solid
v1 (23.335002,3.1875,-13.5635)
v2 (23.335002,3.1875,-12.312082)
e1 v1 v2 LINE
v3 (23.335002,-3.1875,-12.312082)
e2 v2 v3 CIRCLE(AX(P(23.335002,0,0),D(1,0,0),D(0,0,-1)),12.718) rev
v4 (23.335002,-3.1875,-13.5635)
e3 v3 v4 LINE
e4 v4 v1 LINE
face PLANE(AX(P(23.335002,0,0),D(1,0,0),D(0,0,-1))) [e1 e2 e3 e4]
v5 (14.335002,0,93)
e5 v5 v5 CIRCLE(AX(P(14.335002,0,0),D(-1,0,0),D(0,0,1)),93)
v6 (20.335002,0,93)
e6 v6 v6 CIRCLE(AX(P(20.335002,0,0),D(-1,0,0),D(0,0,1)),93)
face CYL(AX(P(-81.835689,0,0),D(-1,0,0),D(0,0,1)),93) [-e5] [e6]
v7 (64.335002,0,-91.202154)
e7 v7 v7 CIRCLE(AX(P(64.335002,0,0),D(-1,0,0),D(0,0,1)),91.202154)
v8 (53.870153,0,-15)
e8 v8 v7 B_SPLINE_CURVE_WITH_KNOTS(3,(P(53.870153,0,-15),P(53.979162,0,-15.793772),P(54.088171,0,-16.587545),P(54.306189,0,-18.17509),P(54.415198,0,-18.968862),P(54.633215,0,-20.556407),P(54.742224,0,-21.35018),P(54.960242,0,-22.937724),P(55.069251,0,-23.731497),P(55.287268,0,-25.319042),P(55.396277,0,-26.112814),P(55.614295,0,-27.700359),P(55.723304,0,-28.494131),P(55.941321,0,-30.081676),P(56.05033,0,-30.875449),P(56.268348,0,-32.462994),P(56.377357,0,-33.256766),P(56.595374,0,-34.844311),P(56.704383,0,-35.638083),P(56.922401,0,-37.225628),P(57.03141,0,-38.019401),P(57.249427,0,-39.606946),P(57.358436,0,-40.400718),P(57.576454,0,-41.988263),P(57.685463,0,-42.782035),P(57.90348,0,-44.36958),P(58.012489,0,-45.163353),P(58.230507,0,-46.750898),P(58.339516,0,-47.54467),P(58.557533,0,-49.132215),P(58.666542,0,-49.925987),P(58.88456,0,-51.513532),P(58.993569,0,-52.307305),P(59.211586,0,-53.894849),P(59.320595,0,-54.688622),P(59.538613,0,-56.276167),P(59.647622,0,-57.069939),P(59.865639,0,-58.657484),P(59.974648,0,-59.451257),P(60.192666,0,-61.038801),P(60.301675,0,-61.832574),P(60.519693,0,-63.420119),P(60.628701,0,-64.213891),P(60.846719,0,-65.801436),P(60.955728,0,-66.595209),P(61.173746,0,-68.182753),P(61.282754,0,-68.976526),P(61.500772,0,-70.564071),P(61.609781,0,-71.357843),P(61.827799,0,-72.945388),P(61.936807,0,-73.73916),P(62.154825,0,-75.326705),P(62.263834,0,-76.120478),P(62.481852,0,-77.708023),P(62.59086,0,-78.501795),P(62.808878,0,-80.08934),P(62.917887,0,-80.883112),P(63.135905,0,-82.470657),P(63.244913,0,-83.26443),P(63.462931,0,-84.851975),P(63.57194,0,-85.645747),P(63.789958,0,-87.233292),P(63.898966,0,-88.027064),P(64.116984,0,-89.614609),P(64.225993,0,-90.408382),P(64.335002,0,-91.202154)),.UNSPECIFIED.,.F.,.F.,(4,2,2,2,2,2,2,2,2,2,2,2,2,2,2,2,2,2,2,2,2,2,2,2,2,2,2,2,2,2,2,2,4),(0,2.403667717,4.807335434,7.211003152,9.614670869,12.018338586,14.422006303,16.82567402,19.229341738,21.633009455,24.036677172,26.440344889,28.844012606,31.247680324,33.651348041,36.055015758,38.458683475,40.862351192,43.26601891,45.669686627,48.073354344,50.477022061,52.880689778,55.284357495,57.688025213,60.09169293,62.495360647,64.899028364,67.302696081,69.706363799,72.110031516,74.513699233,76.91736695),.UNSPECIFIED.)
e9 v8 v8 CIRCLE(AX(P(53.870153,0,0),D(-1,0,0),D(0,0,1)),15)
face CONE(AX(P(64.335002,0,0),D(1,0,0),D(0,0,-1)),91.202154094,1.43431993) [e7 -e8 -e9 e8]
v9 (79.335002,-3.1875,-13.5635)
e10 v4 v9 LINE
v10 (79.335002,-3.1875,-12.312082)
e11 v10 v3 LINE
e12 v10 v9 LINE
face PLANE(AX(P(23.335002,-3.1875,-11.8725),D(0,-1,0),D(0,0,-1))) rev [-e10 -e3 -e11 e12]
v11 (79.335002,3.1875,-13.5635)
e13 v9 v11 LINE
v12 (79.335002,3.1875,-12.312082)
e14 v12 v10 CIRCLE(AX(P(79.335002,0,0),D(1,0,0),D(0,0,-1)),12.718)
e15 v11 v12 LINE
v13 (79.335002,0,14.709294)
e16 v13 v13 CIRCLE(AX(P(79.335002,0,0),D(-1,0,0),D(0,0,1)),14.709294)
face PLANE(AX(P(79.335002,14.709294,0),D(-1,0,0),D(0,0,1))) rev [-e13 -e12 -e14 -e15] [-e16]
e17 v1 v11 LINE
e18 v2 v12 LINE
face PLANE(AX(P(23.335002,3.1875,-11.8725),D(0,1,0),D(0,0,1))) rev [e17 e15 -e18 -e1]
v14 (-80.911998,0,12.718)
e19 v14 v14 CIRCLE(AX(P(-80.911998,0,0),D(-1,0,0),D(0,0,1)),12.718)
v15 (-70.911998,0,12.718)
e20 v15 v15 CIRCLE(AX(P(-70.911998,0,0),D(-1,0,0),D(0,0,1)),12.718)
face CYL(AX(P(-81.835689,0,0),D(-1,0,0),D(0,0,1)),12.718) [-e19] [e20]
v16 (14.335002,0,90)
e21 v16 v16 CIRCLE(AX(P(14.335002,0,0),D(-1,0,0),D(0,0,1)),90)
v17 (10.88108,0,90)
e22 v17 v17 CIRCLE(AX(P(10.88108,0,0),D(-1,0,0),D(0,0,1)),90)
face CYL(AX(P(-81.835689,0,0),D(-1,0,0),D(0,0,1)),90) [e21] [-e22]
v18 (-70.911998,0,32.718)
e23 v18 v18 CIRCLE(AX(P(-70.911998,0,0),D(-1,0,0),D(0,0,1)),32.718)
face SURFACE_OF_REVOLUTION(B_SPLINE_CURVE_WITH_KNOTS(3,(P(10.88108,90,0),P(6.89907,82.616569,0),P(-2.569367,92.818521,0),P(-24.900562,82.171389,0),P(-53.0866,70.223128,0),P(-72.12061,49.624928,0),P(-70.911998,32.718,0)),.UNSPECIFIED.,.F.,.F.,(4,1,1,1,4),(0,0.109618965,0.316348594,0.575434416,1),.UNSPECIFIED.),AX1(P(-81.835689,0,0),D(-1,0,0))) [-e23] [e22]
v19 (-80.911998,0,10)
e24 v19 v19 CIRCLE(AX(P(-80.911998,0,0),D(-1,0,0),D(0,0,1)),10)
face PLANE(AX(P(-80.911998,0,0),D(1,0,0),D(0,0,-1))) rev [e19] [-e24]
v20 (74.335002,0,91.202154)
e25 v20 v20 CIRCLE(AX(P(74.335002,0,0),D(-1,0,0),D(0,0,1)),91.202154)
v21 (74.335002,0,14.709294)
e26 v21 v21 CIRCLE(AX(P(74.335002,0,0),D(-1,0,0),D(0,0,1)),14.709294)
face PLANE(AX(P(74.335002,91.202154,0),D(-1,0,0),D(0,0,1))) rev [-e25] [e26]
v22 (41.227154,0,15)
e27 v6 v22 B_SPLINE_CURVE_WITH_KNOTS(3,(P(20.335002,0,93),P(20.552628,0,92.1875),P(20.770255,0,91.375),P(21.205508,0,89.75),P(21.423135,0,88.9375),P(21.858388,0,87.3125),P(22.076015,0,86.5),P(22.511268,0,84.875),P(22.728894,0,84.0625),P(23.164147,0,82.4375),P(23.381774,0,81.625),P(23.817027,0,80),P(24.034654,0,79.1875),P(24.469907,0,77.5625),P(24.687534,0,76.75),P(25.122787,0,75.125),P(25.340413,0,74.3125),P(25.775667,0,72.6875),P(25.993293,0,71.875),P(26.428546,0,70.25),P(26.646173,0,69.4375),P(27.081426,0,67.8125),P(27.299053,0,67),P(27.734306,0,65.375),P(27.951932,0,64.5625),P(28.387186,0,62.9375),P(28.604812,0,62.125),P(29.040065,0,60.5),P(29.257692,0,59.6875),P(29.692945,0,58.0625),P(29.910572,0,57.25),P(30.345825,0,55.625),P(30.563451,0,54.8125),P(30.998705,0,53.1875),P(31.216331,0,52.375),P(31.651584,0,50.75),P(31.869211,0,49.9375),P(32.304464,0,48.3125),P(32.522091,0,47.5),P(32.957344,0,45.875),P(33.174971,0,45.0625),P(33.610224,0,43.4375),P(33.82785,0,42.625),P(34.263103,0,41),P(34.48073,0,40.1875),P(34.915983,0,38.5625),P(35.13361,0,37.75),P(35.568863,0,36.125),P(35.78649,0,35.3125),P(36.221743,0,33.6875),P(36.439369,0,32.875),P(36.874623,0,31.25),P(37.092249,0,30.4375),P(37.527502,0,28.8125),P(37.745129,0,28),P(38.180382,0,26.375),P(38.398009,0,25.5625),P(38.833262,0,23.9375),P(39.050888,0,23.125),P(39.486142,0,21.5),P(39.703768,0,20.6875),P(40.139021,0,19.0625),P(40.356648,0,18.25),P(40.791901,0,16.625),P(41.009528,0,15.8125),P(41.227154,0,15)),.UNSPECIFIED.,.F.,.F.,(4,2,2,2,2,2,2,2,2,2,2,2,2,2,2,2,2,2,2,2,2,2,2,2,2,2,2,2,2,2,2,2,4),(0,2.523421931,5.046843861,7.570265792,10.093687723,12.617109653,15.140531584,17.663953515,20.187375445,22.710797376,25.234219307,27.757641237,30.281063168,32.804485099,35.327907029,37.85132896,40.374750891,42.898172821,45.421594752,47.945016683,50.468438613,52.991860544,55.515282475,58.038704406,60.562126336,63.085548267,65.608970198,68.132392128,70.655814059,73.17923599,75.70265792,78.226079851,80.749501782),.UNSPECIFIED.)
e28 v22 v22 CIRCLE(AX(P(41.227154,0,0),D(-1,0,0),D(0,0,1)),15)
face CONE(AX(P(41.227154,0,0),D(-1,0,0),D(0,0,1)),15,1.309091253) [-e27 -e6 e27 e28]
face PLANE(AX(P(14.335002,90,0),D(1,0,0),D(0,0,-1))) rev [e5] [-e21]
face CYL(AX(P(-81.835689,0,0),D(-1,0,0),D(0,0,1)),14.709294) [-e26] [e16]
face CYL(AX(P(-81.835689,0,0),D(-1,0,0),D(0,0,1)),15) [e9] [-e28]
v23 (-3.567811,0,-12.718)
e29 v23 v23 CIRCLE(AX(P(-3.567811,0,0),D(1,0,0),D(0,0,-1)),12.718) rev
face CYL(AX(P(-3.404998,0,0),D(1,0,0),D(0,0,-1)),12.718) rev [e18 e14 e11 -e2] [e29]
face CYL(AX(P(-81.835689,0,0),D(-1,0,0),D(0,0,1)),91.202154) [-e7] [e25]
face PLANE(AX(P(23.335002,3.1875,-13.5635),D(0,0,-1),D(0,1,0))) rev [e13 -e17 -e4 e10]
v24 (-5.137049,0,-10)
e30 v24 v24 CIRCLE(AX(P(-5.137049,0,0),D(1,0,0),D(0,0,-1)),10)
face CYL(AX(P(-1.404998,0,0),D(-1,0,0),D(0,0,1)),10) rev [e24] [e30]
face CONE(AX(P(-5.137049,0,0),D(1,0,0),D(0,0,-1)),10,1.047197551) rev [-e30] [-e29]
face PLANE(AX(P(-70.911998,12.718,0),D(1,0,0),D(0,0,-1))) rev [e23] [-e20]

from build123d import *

# Parameters (mm, degrees)
SKETCH2_R          = 12.718
CUT_EXTRUDE1_DEPTH = 82.74
SKETCH3_R          = 10
CUT_EXTRUDE2_DEPTH = 79.507
SKETCH4_W          = 1.691
SKETCH4_H          = 6.375
CUT_EXTRUDE3_DEPTH = 56


with BuildPart() as part:
    # Sketch1 → Revolve1 (revolve)
    with BuildSketch(Plane.XY, mode=Mode.PRIVATE) as revolve1_sk:
        with BuildLine():
            Line((-80.911998208, 0), (-80.911998208, 12.718))
            Line((-80.911998208, 12.718), (-70.911998208, 12.718))
            Line((-70.911998208, 12.718), (-70.911998208, 32.718))
            add(Edge.make_bspline(
                [(-70.911998208, 32.718), (-72.12061009, 49.624927681), (-53.086599537, 70.223127666), (-24.900561644, 82.171389104), (-2.569366769, 92.818520506), (6.899070449, 82.616568551), (10.881080371, 90)],
                knots=[0, 0, 0, 0, 0.424565584, 0.683651406, 0.890381035, 1, 1, 1, 1], degree=3))
            Line((10.881080371, 90), (14.335001792, 90))
            Line((14.335001792, 90), (14.335001792, 93))
            Line((14.335001792, 93), (20.335001792, 93))
            Line((20.335001792, 93), (41.227154337, 15))
            Line((41.227154337, 15), (53.870153491, 15))
            Line((53.870153491, 15), (64.335001792, 91.202154094))
            Line((64.335001792, 91.202154094), (74.335001792, 91.202154094))
            Line((74.335001792, 91.202154094), (74.335001792, 14.709294291))
            Line((74.335001792, 14.709294291), (79.335001792, 14.709294291))
            Line((79.335001792, 14.709294291), (79.335001792, 0))
            Line((79.335001792, 0), (-80.911998208, 0))
        make_face()
    revolve(revolve1_sk.sketch.rotate(Axis((-81.835688806, 0, 0), (1, 0, 0)), 90), axis=Axis((-81.835688806, 0, 0), (1, 0, 0)))

    # Sketch2 → Cut-Extrude1 (cut)
    with BuildSketch(Plane(origin=(79.335001792, 0, 0), x_dir=(0, 0, -1), z_dir=(1, 0, 0))):
        with Locations(Location((0, 0, 0), (0, 0, 180))):
            Circle(SKETCH2_R)
    extrude(amount=-CUT_EXTRUDE1_DEPTH, mode=Mode.SUBTRACT)

    # Sketch3 → Cut-Extrude2 (cut)
    with BuildSketch(Plane.ZY.offset(80.911998208)):
        Circle(SKETCH3_R)
    extrude(amount=-CUT_EXTRUDE2_DEPTH, mode=Mode.SUBTRACT)

    # Chamfer1
    # the kernel refuses this chamfer: 3, 1.732050808 mm, written as the material it takes off along each edge
    with BuildSketch(Plane(origin=(-3.404998208, 0, 0), x_dir=(0, 0, 1), z_dir=(0, -1, 0))) as chamfer1_piece_1_section:
        with BuildLine():
            Line((9.896076952, 1.792050808), (13.103923048, -0.06))
            Line((13.103923048, -0.06), (13.103923048, -0.12))
            ThreePointArc((13.103923048, -0.12), (11.551961524, -0.06), (10, -0.06))
            Line((10, -0.06), (9.94, 0))
            ThreePointArc((9.94, 0), (9.94, 0.896025404), (9.836076952, 1.792050808))
            Line((9.836076952, 1.792050808), (9.896076952, 1.792050808))
        make_face()
    chamfer1_piece_1 = revolve(axis=Axis((-3.404998208, 0, 0), (-1, 0, 0)), mode=Mode.PRIVATE)
    chamfer1_piece_1 = chamfer1_piece_1 & Plane(origin=(-4.331873762, 0, 0), x_dir=(0, 0, 1), z_dir=(1, 0, 0)) * Cylinder(12.718, 53, mode=Mode.PRIVATE)
    add(chamfer1_piece_1, mode=Mode.SUBTRACT)

    # Sketch4 → Cut-Extrude3 (cut)
    with BuildSketch(Plane(origin=(79.335001792, 0, 0), x_dir=(0, 0, -1), z_dir=(1, 0, 0))):
        with Locations((12.718, 0)):
            Rectangle(SKETCH4_W, SKETCH4_H)
    extrude(amount=-CUT_EXTRUDE3_DEPTH, mode=Mode.SUBTRACT)


solid = part.part
